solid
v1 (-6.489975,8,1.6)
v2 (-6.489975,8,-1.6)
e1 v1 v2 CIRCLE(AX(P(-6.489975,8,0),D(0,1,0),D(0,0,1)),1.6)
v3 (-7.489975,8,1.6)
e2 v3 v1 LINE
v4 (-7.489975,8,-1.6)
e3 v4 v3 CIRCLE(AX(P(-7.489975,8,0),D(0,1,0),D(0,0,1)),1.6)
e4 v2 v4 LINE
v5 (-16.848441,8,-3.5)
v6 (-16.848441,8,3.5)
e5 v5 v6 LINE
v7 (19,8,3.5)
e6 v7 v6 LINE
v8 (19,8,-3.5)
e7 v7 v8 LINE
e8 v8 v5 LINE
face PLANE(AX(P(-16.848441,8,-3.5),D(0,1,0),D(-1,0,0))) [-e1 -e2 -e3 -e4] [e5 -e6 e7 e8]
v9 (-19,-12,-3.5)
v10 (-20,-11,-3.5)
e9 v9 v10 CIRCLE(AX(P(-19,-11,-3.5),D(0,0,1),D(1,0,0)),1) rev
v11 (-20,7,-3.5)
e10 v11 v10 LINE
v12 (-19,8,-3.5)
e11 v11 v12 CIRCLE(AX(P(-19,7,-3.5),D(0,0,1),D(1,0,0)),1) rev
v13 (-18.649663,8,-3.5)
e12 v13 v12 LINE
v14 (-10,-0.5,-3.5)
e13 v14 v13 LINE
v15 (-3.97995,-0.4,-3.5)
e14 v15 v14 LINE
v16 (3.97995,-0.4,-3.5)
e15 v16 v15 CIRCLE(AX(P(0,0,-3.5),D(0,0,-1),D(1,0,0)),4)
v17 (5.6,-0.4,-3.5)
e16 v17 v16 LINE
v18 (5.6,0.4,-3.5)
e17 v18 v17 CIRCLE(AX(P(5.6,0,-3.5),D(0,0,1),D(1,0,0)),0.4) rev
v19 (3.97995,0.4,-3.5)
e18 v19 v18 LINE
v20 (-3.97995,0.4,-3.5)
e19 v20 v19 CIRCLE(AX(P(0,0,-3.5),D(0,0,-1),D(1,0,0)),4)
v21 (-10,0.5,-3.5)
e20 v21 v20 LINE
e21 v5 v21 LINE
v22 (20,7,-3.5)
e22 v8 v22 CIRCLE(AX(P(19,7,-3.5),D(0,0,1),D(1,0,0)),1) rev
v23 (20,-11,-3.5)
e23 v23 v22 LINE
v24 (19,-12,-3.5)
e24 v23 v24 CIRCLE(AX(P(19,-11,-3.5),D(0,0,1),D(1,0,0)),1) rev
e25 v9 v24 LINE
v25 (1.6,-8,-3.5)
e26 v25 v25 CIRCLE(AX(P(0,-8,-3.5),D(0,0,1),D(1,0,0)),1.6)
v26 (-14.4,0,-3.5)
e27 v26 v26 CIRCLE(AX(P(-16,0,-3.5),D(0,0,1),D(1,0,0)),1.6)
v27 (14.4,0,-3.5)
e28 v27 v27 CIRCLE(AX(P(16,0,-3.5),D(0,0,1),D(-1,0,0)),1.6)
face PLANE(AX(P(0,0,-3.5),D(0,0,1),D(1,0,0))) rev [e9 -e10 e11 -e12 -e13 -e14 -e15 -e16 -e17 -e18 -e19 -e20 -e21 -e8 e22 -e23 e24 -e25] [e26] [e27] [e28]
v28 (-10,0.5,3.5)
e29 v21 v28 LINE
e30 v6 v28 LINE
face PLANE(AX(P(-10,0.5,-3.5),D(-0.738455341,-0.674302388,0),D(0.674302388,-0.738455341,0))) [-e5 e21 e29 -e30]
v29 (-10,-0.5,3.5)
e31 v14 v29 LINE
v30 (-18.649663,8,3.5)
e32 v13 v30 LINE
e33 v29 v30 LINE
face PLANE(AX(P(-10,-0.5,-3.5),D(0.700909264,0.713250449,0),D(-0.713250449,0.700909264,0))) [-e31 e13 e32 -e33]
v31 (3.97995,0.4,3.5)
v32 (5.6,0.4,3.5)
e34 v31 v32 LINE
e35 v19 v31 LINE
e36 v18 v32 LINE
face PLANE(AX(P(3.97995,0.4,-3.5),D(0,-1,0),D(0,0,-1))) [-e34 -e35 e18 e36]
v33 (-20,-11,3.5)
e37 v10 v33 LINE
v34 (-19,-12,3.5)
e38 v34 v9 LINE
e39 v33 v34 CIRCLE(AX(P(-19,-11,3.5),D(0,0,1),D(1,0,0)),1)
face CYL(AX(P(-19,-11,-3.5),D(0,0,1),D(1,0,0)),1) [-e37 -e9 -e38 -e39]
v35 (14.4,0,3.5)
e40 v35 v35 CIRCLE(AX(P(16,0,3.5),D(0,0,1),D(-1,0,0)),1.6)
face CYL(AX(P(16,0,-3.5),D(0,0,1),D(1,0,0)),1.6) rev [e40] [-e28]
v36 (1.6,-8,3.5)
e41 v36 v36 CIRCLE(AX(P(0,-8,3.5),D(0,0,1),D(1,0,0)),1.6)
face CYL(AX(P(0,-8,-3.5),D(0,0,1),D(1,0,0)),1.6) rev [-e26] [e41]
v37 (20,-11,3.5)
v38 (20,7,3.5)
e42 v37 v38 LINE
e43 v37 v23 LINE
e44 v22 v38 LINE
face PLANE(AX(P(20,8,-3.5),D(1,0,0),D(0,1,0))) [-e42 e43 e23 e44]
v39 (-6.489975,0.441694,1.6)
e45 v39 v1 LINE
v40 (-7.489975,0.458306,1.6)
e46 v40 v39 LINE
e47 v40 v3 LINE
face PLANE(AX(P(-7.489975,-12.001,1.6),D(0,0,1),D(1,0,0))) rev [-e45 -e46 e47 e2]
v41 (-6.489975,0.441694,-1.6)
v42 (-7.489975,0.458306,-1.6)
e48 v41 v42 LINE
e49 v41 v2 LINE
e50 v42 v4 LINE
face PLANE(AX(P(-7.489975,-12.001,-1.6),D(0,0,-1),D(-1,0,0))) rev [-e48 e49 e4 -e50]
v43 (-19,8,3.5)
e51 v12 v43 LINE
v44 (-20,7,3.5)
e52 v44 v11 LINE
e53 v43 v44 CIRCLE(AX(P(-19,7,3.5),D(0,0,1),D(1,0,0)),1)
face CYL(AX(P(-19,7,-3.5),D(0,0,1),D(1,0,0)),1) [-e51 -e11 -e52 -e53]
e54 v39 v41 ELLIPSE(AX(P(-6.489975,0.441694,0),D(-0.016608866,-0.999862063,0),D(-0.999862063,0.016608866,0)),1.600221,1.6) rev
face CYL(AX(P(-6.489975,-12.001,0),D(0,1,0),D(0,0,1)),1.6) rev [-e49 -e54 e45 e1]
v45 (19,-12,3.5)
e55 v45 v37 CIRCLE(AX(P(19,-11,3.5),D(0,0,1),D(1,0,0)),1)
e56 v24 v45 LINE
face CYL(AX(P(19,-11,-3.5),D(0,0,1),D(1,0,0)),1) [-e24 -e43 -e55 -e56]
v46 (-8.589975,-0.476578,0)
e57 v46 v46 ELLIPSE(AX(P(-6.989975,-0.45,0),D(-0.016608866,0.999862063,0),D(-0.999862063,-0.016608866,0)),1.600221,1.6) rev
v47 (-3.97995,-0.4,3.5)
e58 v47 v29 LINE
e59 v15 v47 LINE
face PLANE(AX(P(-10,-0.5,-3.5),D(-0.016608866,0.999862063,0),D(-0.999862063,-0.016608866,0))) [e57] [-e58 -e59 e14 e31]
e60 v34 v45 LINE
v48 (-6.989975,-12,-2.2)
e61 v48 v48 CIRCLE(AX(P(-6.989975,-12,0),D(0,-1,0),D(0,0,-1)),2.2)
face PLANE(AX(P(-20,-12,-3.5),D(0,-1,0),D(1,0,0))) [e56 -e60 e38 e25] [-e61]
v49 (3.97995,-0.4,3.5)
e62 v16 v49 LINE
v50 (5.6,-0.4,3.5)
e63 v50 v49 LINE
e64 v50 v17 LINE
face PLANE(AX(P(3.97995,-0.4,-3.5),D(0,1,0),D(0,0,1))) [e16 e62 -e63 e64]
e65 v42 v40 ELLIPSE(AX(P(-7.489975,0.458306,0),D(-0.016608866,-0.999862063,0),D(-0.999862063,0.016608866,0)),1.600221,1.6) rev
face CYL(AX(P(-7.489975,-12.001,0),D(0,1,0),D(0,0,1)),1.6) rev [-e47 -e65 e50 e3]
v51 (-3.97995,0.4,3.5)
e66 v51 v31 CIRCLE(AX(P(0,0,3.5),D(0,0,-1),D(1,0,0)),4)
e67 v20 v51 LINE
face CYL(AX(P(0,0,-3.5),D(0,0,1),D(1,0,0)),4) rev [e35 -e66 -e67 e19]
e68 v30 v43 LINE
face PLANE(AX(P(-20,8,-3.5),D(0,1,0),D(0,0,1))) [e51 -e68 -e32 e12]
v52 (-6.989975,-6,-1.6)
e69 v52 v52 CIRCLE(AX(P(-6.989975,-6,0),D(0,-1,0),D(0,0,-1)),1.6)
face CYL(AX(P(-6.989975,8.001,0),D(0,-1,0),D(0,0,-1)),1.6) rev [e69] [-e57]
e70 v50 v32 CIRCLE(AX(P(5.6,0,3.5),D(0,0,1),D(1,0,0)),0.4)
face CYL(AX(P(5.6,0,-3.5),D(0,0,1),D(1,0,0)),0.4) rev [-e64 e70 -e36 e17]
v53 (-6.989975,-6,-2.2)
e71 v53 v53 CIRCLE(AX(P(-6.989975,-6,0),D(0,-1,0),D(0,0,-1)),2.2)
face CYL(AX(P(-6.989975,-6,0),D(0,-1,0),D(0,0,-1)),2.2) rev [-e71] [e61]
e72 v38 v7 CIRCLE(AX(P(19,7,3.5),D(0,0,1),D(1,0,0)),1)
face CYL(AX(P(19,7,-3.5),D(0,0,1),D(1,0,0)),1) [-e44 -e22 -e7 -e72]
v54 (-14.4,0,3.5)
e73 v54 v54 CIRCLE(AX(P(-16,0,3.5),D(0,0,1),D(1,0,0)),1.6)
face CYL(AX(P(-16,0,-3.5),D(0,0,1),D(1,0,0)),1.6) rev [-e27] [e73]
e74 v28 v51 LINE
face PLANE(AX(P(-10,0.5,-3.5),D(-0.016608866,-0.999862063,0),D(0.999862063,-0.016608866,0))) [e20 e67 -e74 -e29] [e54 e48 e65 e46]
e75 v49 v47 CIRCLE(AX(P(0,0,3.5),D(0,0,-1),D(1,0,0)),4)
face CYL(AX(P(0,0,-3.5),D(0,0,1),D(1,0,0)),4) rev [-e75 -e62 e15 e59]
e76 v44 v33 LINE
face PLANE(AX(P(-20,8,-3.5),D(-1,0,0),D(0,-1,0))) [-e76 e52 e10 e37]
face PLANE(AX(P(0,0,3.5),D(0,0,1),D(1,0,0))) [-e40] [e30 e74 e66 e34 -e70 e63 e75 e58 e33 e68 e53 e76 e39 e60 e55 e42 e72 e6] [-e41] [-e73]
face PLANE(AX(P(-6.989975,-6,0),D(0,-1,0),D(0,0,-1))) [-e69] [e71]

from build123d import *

# Parameters (mm, degrees)
BOSS_EXTRUDE1_DEPTH      = 3.5
BOSS_EXTRUDE1_DEPTH_BACK = 3.5
SKETCH1_R                = 1.6
CUT_EXTRUDE1_REACH       = 30.5
SKETCH3_R                = 1.6
SKETCH3_3_R              = 2.2
SKETCH3_3_R_2            = 1.6
CUT_EXTRUDE2_DEPTH       = 6
CUT_EXTRUDE3_REACH       = 30.5
FILLET1_R                = 1
FILLET2_R                = 0.4


with BuildPart() as part:
    # Sketch1 → Boss-Extrude1 (new, two sides: drawn at the far end of the back side and taken through both)
    with BuildSketch(Plane.XY.offset(-BOSS_EXTRUDE1_DEPTH_BACK)):
        with BuildLine():
            Line((-20, 8), (-18.64966284, 8))
            Line((-18.64966284, 8), (-10, -0.5))
            Line((-10, -0.5), (-3.979949748, -0.4))
            ThreePointArc((-3.979949748, -0.4), (0, -4), (3.979949748, -0.4))
            Line((3.979949748, -0.4), (6, -0.4))
            Line((6, -0.4), (6, 0.4))
            Line((6, 0.4), (3.979949748, 0.4))
            ThreePointArc((3.979949748, 0.4), (0, 4), (-3.979949748, 0.4))
            Line((-3.979949748, 0.4), (-10, 0.5))
            Line((-10, 0.5), (-16.848441102, 8))
            Line((-16.848441102, 8), (20, 8))
            Line((20, 8), (20, -12))
            Line((20, -12), (-20, -12))
            Line((-20, -12), (-20, 8))
        make_face()
        with Locations((-16, 0)):
            Circle(SKETCH1_R, mode=Mode.SUBTRACT)
        with Locations(Location((16, 0, 0), (0, 0, 180))):
            Circle(SKETCH1_R, mode=Mode.SUBTRACT)
        with Locations((0, -8)):
            Circle(SKETCH1_R, mode=Mode.SUBTRACT)
    extrude(amount=BOSS_EXTRUDE1_DEPTH + BOSS_EXTRUDE1_DEPTH_BACK)

    # Cut-Extrude1: up to this plane
    cut_extrude1_end = Plane(origin=(-10, -0.5, -3.5), z_dir=(-0.016608865731892127, 0.9998620632762801, 0))
    # Sketch3 → Cut-Extrude1 (cut, up to the surface)
    with BuildSketch(Plane.XZ.offset(12), mode=Mode.PRIVATE) as cut_extrude1_sk1:
        with Locations(Location((-6.989974874, 0, 0), (0, 0, 270))):
            Circle(SKETCH3_R)
    cut_extrude1_tool1 = split(extrude(cut_extrude1_sk1.sketch, amount=-CUT_EXTRUDE1_REACH, mode=Mode.PRIVATE), bisect_by=cut_extrude1_end, keep=Keep.BOTH, mode=Mode.PRIVATE)
    add(cut_extrude1_tool1.solids().sort_by_distance((-6.989975, -12, 0))[0], mode=Mode.SUBTRACT)

    # Sketch3<3> → Cut-Extrude2 (cut)
    with BuildSketch(Plane.XZ.offset(12)):
        with Locations(Location((-6.989974874, 0, 0), (0, 0, 270))):
            Circle(SKETCH3_3_R)
        with Locations(Location((-6.989974874, 0, 0), (0, 0, 270))):
            Circle(SKETCH3_3_R_2, mode=Mode.SUBTRACT)
    extrude(amount=-CUT_EXTRUDE2_DEPTH, mode=Mode.SUBTRACT)

    # Cut-Extrude3: up to this plane
    cut_extrude3_end = Plane(origin=(-10, 0.5, -3.5), z_dir=(-0.016608865731892127, -0.9998620632762801, 0))
    # Sketch4 → Cut-Extrude3 (cut, up to the surface)
    with BuildSketch(Plane(origin=(0, 8, 0), x_dir=(1, 0, 0), z_dir=(0, 1, 0)), mode=Mode.PRIVATE) as cut_extrude3_sk1:
        with BuildLine():
            Line((-7.489974874, 1.6), (-6.489974874, 1.6))
            ThreePointArc((-6.489974874, 1.6), (-4.889974874, 0), (-6.489974874, -1.6))
            Line((-6.489974874, -1.6), (-7.489974874, -1.6))
            ThreePointArc((-7.489974874, -1.6), (-9.089974874, 0), (-7.489974874, 1.6))
        make_face()
    cut_extrude3_tool1 = split(extrude(cut_extrude3_sk1.sketch, amount=-CUT_EXTRUDE3_REACH, mode=Mode.PRIVATE), bisect_by=cut_extrude3_end, keep=Keep.BOTH, mode=Mode.PRIVATE)
    add(cut_extrude3_tool1.solids().sort_by_distance((-6.989975, 8, 0))[0], mode=Mode.SUBTRACT)

    # Fillet1
    fillet1_edges = [part.edges().sort_by_distance(p)[0] for p in [
        (20, 8, 0),
        (20, -12, 0),
        (-20, -12, 0),
        (-20, 8, 0),
    ]]
    fillet(fillet1_edges, radius=FILLET1_R)

    # Fillet2
    fillet2_edges = [part.edges().sort_by_distance(p)[0] for p in [
        (6, -0.4, 0),
        (6, 0.4, 0),
    ]]
    fillet(fillet2_edges, radius=FILLET2_R - 0.0001)  # a hair under: the kernel refuses the full size


solid = part.part
